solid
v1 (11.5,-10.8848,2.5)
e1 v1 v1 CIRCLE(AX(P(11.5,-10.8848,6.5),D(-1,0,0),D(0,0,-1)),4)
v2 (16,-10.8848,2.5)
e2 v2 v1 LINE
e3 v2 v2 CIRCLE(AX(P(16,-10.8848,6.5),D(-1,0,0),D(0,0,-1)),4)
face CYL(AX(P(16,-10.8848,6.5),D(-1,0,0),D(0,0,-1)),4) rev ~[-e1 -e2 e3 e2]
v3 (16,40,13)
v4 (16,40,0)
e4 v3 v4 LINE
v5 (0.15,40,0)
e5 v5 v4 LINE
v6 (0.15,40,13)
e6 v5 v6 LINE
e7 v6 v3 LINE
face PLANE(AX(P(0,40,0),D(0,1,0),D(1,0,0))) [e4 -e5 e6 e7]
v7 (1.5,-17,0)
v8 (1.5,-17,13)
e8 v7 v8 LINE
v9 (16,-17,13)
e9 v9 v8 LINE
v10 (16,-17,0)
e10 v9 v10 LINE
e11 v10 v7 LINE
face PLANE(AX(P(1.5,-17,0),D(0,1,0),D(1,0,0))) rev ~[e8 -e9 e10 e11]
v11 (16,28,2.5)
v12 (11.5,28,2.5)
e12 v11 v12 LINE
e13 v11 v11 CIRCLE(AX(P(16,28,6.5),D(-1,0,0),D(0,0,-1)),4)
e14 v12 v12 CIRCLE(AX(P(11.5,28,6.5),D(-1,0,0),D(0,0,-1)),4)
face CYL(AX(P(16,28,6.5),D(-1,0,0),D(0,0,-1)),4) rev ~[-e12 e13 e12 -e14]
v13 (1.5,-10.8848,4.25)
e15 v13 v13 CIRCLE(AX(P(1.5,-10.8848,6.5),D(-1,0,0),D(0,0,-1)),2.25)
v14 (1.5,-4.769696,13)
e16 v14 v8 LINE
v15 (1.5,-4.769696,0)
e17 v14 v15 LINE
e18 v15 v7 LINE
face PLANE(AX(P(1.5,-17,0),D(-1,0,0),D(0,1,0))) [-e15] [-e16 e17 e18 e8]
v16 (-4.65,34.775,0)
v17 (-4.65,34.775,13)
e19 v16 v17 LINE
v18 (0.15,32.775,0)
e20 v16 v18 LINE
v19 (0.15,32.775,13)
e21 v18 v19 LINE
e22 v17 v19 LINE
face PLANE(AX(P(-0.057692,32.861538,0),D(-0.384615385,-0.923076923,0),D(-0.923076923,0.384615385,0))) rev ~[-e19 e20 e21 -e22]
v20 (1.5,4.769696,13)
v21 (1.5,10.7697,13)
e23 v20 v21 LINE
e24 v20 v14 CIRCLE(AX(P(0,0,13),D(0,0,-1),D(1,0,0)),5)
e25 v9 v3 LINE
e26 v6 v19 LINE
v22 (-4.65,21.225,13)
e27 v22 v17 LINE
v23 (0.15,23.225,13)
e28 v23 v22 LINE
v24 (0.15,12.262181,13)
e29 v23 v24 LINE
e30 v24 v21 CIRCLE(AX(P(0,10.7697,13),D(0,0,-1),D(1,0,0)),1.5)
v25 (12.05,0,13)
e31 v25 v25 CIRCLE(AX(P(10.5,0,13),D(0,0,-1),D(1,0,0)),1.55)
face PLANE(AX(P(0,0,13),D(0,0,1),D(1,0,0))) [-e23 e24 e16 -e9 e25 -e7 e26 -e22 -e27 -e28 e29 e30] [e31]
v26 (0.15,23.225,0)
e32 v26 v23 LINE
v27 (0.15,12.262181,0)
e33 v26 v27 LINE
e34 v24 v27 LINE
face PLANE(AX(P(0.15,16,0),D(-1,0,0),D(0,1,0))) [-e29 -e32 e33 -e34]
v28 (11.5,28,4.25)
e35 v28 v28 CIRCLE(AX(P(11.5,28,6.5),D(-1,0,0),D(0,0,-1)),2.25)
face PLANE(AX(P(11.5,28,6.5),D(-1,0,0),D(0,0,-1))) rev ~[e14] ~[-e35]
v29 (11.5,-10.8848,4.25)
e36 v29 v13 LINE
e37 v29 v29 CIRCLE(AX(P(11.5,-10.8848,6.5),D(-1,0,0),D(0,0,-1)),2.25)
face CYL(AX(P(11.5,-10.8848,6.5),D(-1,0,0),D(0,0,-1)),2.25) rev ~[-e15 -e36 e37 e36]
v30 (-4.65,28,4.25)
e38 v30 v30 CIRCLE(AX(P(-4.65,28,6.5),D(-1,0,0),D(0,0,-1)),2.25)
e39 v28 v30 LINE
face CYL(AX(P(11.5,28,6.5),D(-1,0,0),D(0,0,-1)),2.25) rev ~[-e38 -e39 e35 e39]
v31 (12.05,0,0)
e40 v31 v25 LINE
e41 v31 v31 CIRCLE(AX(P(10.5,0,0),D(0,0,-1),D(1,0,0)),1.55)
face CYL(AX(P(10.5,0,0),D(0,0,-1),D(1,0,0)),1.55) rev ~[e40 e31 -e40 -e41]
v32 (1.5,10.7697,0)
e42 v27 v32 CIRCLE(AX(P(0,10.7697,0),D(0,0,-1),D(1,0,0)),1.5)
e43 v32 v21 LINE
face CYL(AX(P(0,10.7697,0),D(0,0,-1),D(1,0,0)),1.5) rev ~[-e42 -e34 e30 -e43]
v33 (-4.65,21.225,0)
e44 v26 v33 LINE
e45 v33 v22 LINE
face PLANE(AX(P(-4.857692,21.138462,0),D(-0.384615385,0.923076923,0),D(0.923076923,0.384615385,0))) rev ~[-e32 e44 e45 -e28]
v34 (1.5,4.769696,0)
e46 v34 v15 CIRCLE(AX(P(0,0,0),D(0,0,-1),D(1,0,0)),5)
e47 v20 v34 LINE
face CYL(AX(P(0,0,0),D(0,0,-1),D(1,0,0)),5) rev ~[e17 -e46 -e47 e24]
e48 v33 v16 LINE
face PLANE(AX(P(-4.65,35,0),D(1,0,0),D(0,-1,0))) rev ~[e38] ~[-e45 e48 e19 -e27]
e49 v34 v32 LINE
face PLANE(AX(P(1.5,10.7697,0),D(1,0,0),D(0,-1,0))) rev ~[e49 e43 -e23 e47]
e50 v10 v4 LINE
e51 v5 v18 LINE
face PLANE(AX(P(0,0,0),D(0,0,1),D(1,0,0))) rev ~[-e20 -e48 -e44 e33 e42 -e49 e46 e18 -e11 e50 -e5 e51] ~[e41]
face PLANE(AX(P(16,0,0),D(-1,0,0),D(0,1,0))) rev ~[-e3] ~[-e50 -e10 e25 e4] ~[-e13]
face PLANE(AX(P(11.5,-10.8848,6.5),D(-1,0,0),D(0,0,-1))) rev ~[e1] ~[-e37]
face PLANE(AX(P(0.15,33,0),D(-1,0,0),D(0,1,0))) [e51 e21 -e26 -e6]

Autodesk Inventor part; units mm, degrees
ref_plane "YZ Plane" through (0, 0, 0) normal (1, 0, 0) x (0, 1, 0)
ref_plane "XZ Plane" through (0, 0, 0) normal (0, 1, 0) x (-1, 0, 0)
sketch "Skizze1" plane through (0, 0, 0) normal (0, 0, 1) x (1, 0, 0)
  line L0 (-33.0017, 0) -> (83.0017, 0) construction
  circle A0 centre (50, 151.9868) radius 16
  line L1 (66, 151.9868) -> (66, 221.9868)
  line L2 (34, 151.9868) -> (34, 221.9868)
  line L3 (50, 151.9868) -> (50, 237.9868) construction
  line L4 (50, 151.9868) -> (50, 167.9868) construction
  line L5 (34, 151.9868) -> (66, 151.9868) construction
  line L6 (-16, 0) -> (-16, 50)
  line L7 (16, 0) -> (16, 50)
  line L8 (-16, 50) -> (16, 50) construction
  circle A1 centre (0, 50) radius 16 construction
  line L9 (-14.2566, 57.2629) -> (34, 151.9868)
  arc A2 (-14.2566, 57.2629) -> (-16, 50) centre (0, 50) ccw
  line L10 (16, 50) -> (64.2566, 144.7239)
  arc A3 (64.2566, 144.7239) -> (66, 151.9868) centre (50, 151.9868) ccw
  line L11 (0, 50) -> (50, 151.9868) construction
  circle A4 centre (50, 221.9868) radius 16
  circle A5 centre (50, 221.9868) radius 9.5
  circle A6 centre (50, 151.9868) radius 9.5
  line L12 (0, 0) -> (0, 5) construction
  circle A7 centre (50, 151.9868) radius 12.75 construction
  circle A8 centre (50, 221.9868) radius 12.75 construction
  line L13 (0, 0) -> (50, 221.9868) construction
  circle A9 centre (50, 221.9868) radius 10.5
  circle A10 centre (50, 151.9868) radius 10.5
  circle A11 centre (50, 151.9868) radius 12
  circle A12 centre (50, 221.9868) radius 12
  line L14 (-16, 0) -> (-16, -17)
  line L15 (-16, -17) -> (16, -17)
  line L16 (16, -17) -> (16, 0)
  circle A13 centre (0, 0) radius 5
  line L17 (-1.5, -4.7697) -> (-1.5, -17)
  line L18 (1.5, -17) -> (1.5, -4.7697)
  line L19 (-16, 0) -> (16, 0) construction
  arc A14 (16, 0) -> (-16, 0) centre (0, 0) ccw
  line L20 (-1.5, 4.7697) -> (-1.5, 10.7697)
  arc A15 (1.5, 10.7697) -> (-1.5, 10.7697) centre (0, 10.7697) ccw
  line L21 (1.5, 10.7697) -> (1.5, 4.7697)
  line L22 (1.5, 4.7697) -> (-1.5, 4.7697)
  line L23 (0, 12.2697) -> (0, 40)
  line L24 (0, 40) -> (16, 40)
  line L25 (0, 33) -> (-4.8, 35)
  line L26 (-4.8, 35) -> (-4.8, 21)
  line L27 (-4.8, 21) -> (0, 23)
  line L28 (-4.8, 28) -> (0, 28) construction
  line L29 (-4.8, 30.5) -> (0, 30.5) construction
  line L30 (-4.8, 25.5) -> (0, 25.5) construction
  circle A16 centre (-10.5, 0) radius 1.55
  circle A17 centre (10.5, 0) radius 1.55
  line L31 (0, 0) -> (50, 151.9868) construction
  point P0 (26.4122, 103.8739)
  point P1 (50, 186.9868)
  point P2 (50, 164.7368)
  point P3 (38.9582, 145.6118)
  point P4 (61.0418, 145.6118)
  point P5 (50, 234.7368)
  point P6 (38.9582, 215.6118)
  point P7 (61.0418, 215.6118)
  point P8 (-5, 0)
  dimension "d69" = 25.5
  dimension "ParallelHebel_Passflansch_HoleDia" = 25.5
  dimension "d36" = 0
  dimension "ParallelHebel_Gabelgelenk_OuterDia" = 32
  dimension "VerticalDistance" = 70
  dimension "d42" = 60
  dimension "d43" = 19
  dimension "Nadellager_OuterDia" = 19
  dimension "d45" = 35
  dimension "d67" = 360
  dimension "d72" = 360
  dimension "Distanze_daVinciHead_Pivot" = 221.9868
  dimension "d88" = 21
  dimension "d91" = 24
  dimension "d92" = 24
  dimension "d97" = 151.9868
  dimension "Support_Link_Length" = 160
  dimension "d100" = 10
  dimension "d101" = 3
  dimension "d102" = 0
  dimension "d103" = 17
  dimension "d105" = 32
  dimension "d125" = 50
  dimension "d128" = 50
  dimension "d138" = 6
  dimension "d139" = 10
  dimension "d142" = 14
  dimension "d143" = 10
  dimension "d144" = 2.5
  dimension "d145" = 5
  dimension "d146" = 4.8
  dimension "d147" = 28
  dimension "d173" = 11
  dimension "d174" = 5.5
  dimension "d175" = 3.1
  dimension "d178" = 71.79
extrude "Extrusion2" add sketch "Skizze1" along normal blind 8 contours A0 | A0 L2 A4 L1 | A0 L10 L7 L24 L23 L25 L26 L27 A14 L6 A2 L9 | A4 | L7 A14 L23 L24 | A14 L23 A15 L20 A13 L17 L15 L14 | L16 L15 L18 A13 L21 A15 L23 A14 | L23 L27 L26 L25 | A15 L21 A13 L20 | A9 | A10 | A11 | A12 | A16 | A17
fillet "Rundung1" radius 25 2 edges at (34, 151.9868, 4) (16, 50, 4)
hole "Bohrung2" at (50, 186.9868, 0) at (26.4122, 103.8739, 0) direction (0, 0, 1) diameter 8 end through all
ref_plane "Arbeitsebene1" through (50, 151.9868, 0) normal (-1, 0, 0) x (0, 0, 1)
extrude "Extrusion6" cut sketch "Skizze1" along normal blind 1 contours A5 | A9 | A10 | A11 | A12
extrude "Extrusion7" cut sketch "Skizze1" along normal blind 1 from surface at 1 contours A9 | A10
sketch "Skizze8" plane through (0, 0, 8) normal (0, 0, 1) x (1, 0, 0)
  circle A0 centre (50, 186.9868) radius 4 projected
  circle A1 centre (26.4122, 103.8739) radius 4 projected
  arc A2 (64.2566, 144.7239) -> (66, 151.9868) centre (50, 151.9868) ccw projected
  line L0 (66, 151.9868) -> (66, 221.9868) projected
  arc A3 (66, 221.9868) -> (34, 221.9868) centre (50, 221.9868) ccw projected
  line L1 (34, 221.9868) -> (34, 157.988) projected
  arc A4 (31.2759, 146.6396) -> (34, 157.988) centre (9, 157.988) ccw projected
  line L2 (31.2759, 146.6396) -> (-14.2566, 57.2629) projected
  arc A5 (-14.2566, 57.2629) -> (-16, 50) centre (0, 50) ccw projected
  line L3 (-16, 50) -> (-16, -17) projected
  line L4 (-16, -17) -> (-1.5, -17) projected
  line L5 (-1.5, -17) -> (-1.5, -4.7697) projected
  arc A6 (1.5, -4.7697) -> (-1.5, -4.7697) centre (0, 0) ccw projected
  line L6 (1.5, -4.7697) -> (1.5, -17) projected
  line L7 (1.5, -17) -> (16, -17) projected
  line L8 (16, -17) -> (16, 43.9989) projected
  arc A7 (18.7241, 55.3472) -> (16, 43.9989) centre (41, 43.9989) ccw projected
  line L9 (18.7241, 55.3472) -> (64.2566, 144.7239) projected
  circle A8 centre (50, 151.9868) radius 9.5 projected
  circle A9 centre (50, 221.9868) radius 9.5 projected
extrude "Extrusion9" add sketch "Skizze8" along normal blind 5
sketch "Skizze5" plane through (-1.5, -17, 0) normal (1, 0, 0) x (0, 0, -1)
  line L0 (0, 0) -> (0, 12.2303) construction
  line L1 (0, 12.2303) -> (-13, 12.2303) construction
  line L2 (0, 0) -> (-13, 0) construction
  line L3 (-13, 12.2303) -> (0, 0) construction
  line L4 (-13, 0) -> (0, 12.2303) construction
  line L5 (-13, 0) -> (-13, 12.2303) construction
  point P0 (0, 17)
  point P1 (-6.5, 6.1152)
extrude "Extrusion11" add sketch "Skizze1" along normal up to surface (13 mm away) separate body contours L7 A14 L23 L24 | L16 L15 L18 A13 L21 A15 L23 A14 | L23 L27 L26 L25 | A17
extrude "Extrusion10" cut sketch "Skizze1" along normal up to surface (13 mm away) contours L7 A14 L23 L24 | L16 L15 L18 A13 L21 A15 L23 A14 | L23 L27 L26 L25 | A15 L21 A13 L20 | A17 bodies 1
hole "Bohrung4" at (-1.5, -10.8848, 6.5) direction (-1, 0, 0) diameter 3.242 end through all bodies 1 thread size "M4x0.7" class "6H" standard "ISO Metric profile"
sketch "Skizze9" plane through (16, -17, 0) normal (1, 0, 0) x (0, 0, -1)
  point P0 (0, 17)
  point P1 (-6.5, 6.1152)
hole "Bohrung6" at (16, -10.8848, 6.5) direction (-1, 0, 0) diameter 4.5 depth 17.5 counterbore diameter 8 counterbore depth 4.5 bodies 2 clearance for "Inbusschraube DIN EN ISO 4762" size "M4" standard "DIN"
ref_plane "Arbeitsebene2" through (-4.8, 72.7467, 13) normal (-1, 0, 0) x (0, 1, 0)
sketch "Skizze12" plane through (-4.8, 72.7467, 13) normal (-1, 0, 0) x (0, 1, 0)
  line L0 (-44.7467, 13) -> (-44.7467, 6.5) construction
  line L1 (-22.7467, 13) -> (-89.7467, 13) construction
  line L2 (-22.7467, 0) -> (-89.7467, 0) construction
  point P0 (-72.7467, 13)
  point P1 (-44.7467, 13)
  dimension "d150" = 13
  dimension "d151" = 6.5
sketch "Skizze13" plane through (16, -17, 0) normal (1, 0, 0) x (0, 0, -1)
  point P0 (0, 17)
  point P1 (-6.5, 45)
hole "Bohrung7" at (-4.8, 28, 6.5) direction (-1, 0, 0) diameter 3.242 end through all bodies 1 thread size "M4x0.7" class "6H" standard "ISO Metric profile"
hole "Bohrung8" at (16, 28, 6.5) direction (-1, 0, 0) diameter 4.5 end through all counterbore diameter 8 counterbore depth 4.5 bodies 2 clearance for "Inbusschraube DIN EN ISO 4762" size "M4" standard "DIN"
extrude "Extrusion12" cut sketch "Skizze1" along normal through all contours A17 bodies 2
delete faces "Fläche löschen1" heal no whole lump yes faces at (-8.5333, 28.26, 4.9)
thicken "Thicken1" operation add thickness 0.15 both sides no extend neighbours yes toward (-0.3846154, -0.9230769, 0) bodies 2 faces at (-1.6, 33.6667, 4.3333) (-4.8, 22.5888, 6.5904) (-3.2, 21.6667, 4.3333) (0, 19.4232, 8.6667) (0, 37.6667, 4.3333)
equation "\"NKX_10_RiadialPart_Dia\" = 19"
equation "\"Lager_Bohrung_Durchmesser\" = 19"
equation "\"Lager_Einbautiefe\" = 5"
properties part number "ParallelSystem_ProximalPart_Driven_Counterpart" material "PBT-Kunststoff"
